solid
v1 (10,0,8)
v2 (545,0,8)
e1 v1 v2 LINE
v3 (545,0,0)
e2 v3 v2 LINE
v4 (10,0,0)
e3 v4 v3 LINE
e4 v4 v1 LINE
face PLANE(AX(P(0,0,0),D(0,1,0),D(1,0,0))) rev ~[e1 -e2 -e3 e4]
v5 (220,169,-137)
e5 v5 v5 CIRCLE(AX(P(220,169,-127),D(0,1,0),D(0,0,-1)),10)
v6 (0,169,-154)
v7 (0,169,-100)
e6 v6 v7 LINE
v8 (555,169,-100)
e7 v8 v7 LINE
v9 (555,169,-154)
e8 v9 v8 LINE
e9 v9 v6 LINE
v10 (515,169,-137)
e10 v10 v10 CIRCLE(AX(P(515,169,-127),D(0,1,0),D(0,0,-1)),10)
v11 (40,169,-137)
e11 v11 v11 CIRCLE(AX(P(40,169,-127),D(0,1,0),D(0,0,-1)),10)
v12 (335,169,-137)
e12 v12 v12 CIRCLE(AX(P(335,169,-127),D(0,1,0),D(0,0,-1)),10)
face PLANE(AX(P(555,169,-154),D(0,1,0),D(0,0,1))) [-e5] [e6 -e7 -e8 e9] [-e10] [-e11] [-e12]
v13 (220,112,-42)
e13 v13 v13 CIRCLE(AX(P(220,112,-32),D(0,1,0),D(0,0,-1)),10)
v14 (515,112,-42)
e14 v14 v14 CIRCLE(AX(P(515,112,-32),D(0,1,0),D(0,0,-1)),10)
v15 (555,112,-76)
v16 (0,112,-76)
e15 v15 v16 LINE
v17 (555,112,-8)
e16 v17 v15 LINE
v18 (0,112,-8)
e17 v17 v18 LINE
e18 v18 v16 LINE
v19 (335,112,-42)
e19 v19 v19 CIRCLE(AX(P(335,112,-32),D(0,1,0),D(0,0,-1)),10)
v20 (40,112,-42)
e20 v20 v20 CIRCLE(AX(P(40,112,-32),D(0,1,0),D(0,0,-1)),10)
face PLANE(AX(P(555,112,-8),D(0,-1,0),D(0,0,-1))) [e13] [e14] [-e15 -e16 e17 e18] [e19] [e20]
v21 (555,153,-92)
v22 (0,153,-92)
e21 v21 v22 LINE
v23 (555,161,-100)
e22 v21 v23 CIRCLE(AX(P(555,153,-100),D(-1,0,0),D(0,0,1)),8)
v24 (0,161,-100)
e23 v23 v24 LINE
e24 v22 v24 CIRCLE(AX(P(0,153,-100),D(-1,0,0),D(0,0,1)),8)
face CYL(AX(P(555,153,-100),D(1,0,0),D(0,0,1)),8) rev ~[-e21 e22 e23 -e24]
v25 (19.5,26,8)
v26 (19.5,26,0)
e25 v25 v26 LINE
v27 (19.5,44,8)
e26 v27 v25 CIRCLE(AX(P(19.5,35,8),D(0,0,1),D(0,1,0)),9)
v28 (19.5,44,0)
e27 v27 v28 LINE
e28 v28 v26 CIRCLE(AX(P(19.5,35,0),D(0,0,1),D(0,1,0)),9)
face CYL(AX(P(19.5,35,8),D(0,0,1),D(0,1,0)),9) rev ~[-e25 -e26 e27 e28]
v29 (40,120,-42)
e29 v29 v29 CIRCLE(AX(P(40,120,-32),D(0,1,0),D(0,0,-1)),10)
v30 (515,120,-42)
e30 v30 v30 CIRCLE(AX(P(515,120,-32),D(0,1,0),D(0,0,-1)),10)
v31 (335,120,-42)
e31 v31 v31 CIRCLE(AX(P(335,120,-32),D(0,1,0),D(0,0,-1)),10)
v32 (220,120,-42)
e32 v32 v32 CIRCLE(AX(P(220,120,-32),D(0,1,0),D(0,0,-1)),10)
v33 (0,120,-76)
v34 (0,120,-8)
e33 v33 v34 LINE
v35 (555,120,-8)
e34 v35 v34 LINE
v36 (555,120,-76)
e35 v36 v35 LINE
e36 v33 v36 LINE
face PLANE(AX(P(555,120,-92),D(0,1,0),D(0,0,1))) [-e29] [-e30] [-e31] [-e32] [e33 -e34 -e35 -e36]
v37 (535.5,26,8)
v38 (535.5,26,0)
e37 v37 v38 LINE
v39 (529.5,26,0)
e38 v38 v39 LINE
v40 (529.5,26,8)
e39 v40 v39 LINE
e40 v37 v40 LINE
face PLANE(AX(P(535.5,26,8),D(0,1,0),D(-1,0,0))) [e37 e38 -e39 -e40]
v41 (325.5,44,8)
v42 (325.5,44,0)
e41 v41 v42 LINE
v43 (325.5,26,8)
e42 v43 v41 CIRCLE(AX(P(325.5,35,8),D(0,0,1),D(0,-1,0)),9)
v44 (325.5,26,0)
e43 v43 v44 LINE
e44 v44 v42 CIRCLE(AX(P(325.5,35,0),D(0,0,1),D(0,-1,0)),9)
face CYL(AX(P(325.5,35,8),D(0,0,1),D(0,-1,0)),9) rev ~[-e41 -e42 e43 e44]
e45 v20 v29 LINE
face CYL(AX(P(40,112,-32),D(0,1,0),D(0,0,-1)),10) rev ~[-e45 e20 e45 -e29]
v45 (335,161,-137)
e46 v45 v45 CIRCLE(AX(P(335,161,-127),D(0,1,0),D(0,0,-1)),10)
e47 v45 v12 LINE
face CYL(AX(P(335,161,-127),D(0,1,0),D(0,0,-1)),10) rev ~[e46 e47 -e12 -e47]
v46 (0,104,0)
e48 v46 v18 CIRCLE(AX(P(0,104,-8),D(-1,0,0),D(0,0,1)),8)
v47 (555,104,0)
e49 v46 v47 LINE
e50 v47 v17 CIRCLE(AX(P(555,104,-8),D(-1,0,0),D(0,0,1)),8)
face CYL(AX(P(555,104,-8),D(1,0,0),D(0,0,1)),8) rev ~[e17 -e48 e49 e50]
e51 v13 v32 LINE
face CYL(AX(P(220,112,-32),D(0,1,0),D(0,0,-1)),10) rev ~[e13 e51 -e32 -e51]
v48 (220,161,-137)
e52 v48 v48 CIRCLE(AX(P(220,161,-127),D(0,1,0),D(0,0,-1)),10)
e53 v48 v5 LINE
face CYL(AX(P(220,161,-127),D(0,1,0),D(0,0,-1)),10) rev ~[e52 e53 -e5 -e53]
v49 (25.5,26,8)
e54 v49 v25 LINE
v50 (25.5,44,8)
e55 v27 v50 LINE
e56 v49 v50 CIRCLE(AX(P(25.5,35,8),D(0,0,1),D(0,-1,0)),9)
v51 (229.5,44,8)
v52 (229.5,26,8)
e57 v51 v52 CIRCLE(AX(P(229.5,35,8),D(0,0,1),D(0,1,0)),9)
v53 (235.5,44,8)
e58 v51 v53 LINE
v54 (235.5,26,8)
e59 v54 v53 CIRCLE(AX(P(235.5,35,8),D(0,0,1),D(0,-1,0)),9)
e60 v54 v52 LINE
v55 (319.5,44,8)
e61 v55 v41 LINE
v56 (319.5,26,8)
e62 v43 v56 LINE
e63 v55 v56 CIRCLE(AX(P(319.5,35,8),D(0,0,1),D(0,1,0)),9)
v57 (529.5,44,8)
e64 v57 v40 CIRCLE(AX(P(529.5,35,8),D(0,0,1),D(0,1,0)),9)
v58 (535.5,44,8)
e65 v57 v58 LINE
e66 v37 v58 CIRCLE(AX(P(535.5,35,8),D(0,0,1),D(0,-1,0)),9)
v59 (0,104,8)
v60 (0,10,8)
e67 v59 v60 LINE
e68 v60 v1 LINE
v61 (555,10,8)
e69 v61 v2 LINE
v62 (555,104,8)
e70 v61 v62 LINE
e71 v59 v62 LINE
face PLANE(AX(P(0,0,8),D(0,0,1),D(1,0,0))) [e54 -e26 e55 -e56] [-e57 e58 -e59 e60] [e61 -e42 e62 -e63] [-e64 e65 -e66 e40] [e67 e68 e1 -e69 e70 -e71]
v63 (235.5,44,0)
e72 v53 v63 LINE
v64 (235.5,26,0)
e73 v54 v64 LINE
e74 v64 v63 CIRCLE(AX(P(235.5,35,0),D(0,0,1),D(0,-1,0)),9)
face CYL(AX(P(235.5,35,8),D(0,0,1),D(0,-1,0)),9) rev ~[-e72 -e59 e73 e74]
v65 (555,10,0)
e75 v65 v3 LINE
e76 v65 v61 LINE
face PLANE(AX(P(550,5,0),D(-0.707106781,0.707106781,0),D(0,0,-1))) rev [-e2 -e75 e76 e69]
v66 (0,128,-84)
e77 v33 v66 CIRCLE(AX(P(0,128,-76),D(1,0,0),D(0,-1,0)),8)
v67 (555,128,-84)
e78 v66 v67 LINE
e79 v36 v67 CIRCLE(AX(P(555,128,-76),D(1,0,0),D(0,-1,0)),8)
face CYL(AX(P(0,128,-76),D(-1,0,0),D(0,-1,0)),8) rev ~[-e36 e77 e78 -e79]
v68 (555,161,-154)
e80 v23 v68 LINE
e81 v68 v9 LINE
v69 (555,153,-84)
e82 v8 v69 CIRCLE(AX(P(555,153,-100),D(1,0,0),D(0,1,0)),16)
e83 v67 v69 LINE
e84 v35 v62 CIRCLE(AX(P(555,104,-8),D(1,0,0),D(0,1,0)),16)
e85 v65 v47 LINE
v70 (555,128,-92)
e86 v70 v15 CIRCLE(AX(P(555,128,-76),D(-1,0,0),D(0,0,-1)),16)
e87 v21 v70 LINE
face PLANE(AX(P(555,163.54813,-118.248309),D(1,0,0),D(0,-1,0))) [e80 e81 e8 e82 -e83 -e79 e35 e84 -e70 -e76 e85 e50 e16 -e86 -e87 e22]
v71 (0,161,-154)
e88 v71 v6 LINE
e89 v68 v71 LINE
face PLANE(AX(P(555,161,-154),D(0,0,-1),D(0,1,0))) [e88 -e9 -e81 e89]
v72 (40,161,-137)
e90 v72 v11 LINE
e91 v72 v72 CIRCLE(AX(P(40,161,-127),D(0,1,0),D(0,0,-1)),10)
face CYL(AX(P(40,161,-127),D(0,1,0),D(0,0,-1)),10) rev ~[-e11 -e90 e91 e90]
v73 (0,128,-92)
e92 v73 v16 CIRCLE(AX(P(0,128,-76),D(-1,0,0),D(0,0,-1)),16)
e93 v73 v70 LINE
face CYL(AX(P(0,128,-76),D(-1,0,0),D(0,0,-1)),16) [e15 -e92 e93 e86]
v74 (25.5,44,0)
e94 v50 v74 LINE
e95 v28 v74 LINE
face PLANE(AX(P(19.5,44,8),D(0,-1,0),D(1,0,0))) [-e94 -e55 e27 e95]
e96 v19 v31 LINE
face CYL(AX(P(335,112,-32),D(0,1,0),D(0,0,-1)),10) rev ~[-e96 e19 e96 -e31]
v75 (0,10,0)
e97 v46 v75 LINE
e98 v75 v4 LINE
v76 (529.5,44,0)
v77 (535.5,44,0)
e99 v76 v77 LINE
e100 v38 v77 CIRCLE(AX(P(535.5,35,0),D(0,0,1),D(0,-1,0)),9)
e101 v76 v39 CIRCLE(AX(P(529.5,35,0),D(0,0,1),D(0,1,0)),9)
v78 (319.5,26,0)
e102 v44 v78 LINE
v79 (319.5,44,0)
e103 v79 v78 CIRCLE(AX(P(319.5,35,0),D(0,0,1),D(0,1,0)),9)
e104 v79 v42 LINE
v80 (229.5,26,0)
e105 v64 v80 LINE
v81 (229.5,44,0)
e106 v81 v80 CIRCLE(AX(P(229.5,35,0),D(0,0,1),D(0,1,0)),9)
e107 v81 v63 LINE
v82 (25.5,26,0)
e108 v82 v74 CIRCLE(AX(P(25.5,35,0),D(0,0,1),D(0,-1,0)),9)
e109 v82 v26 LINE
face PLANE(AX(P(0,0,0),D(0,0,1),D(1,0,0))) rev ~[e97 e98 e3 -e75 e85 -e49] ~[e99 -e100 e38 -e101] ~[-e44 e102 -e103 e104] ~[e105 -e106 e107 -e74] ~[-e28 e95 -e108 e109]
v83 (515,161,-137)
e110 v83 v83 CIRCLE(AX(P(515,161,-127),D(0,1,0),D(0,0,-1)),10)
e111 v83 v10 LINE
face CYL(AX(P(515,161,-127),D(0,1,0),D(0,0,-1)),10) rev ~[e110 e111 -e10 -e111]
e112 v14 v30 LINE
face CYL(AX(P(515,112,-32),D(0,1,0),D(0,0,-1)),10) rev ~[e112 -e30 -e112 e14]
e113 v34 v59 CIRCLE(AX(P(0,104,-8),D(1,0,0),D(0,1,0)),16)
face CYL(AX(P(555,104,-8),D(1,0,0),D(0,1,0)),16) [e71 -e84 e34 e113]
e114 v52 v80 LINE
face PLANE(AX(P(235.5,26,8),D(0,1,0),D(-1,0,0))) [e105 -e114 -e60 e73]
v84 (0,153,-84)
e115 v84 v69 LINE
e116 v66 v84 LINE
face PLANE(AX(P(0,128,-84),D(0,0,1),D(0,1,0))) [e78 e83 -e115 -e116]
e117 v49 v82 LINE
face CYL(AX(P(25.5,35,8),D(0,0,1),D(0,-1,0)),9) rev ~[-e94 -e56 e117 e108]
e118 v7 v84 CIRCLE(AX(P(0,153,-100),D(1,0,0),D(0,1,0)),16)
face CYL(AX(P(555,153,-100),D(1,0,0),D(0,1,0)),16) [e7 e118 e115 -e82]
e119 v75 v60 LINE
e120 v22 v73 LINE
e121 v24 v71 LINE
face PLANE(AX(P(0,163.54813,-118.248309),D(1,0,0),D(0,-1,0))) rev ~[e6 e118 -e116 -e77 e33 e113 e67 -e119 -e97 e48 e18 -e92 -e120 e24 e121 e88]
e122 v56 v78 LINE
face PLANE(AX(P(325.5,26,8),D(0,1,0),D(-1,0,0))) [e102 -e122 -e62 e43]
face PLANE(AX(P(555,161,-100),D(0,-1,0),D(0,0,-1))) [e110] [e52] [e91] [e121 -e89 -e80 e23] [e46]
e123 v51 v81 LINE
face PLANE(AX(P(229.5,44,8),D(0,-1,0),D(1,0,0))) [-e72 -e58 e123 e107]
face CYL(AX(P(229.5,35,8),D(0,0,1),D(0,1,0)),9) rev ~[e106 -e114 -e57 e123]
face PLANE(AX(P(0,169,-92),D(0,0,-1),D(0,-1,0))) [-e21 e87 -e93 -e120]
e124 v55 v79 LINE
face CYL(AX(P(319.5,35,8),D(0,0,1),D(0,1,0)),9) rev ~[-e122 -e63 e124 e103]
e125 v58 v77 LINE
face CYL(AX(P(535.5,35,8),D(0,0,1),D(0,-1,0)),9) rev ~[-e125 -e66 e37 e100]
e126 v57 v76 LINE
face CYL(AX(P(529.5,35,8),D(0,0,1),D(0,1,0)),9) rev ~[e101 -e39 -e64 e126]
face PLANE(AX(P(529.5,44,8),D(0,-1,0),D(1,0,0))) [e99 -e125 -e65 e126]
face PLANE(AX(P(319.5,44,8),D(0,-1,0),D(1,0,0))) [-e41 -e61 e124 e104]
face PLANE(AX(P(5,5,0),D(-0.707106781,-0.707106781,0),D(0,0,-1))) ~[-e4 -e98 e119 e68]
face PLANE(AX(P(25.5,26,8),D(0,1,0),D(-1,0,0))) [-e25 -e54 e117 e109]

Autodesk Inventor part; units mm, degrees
ref_plane "YZ Plane" through (0, 0, 0) normal (1, 0, 0) x (0, 1, 0)
ref_plane "XZ Plane" through (0, 0, 0) normal (0, 1, 0) x (-1, 0, 0)
ref_plane "XY Plane" through (0, 0, 0) normal (0, 0, 1) x (1, 0, 0)
sketch "Sketch1" plane through (0, 0, 0) normal (0, 0, 1) x (1, 0, 0)
  line L0 (0, 0) -> (555, 0)
  line L1 (555, 0) -> (555, 120)
  line L2 (555, 120) -> (0, 120)
  line L3 (0, 120) -> (0, 0)
  dimension "d0" = 120
  dimension "d1" = 555
extrude "Plate1" add sketch "Sketch1" along normal blind 8
sketch "Sketch2" plane through (555, 112, 8) normal (0, 1, 0) x (-1, 0, 0)
  line L0 (555, 0) -> (0, 0)
  line L1 (0, 0) -> (0, -100)
  line L2 (0, -100) -> (555, -100)
  line L3 (555, -100) -> (555, 0)
edge flange "Flange1" height 100 angle 90 thickness 8 bend radius 8 thickness toward (0, 1, 0) relief tear relief width 8 relief depth 4 edges at (277.5, 120, 0) wall of the first edge with corners at (0, 112, 8) (555, 112, 8) (555, 112, -92) (0, 112, -92)
bend "Bend1"
corner "Corner1"
sketch "Sketch3" plane through (0, 112, -92) normal (0, -1, 0) x (1, 0, 0)
  line L0 (0, 0) -> (0, 84) projected
  line L1 (0, 0) -> (555, 0) projected
  line L2 (555, 0) -> (555, 84) projected
  circle A0 centre (40, 60) radius 10
  circle A1 centre (515, 60) radius 10
  circle A2 centre (220, 60) radius 10
  circle A3 centre (335, 60) radius 10
  point P0 (0, 92)
  dimension "d13" = 20
  dimension "d14" = 20
  dimension "d15" = 40
  dimension "d16" = 60
  dimension "d17" = 60
  dimension "d18" = 40
  dimension "d19" = 20
  dimension "d20" = 180
  dimension "d21" = 20
  dimension "d22" = 180
  dimension "d23" = 60
  dimension "d24" = 60
hole "Hole1" at (40, 112, -32) at (220, 112, -32) at (335, 112, -32) at (515, 112, -32) direction (0, 1, 0) diameter 20 depth 8 tip angle 118
sketch "Sketch4" plane through (0, 0, 8) normal (0, 0, 1) x (1, 0, 0)
  circle A0 centre (544.5, 10.5) radius 1.1625 projected
  circle A1 centre (544.5, 59.5) radius 1.1625 projected
  arc A2 (535.5, 26) -> (535.5, 44) centre (535.5, 35) ccw projected
  line L0 (535.5, 26) -> (529.5, 26) projected
  arc A3 (529.5, 44) -> (529.5, 26) centre (529.5, 35) ccw projected
  line L1 (529.5, 44) -> (535.5, 44) projected
  line L2 (507.5, 26.468) -> (507.5, 43.532) projected
  arc A4 (505.7408, 21) -> (507.5, 26.468) centre (471.6029, 35) ccw projected
  line L3 (505.7408, 21) -> (482.22, 0) projected
  line L4 (482.22, 0) -> (545, 0) projected
  line L5 (545, 0) -> (553, 8) projected
  line L6 (553, 8) -> (553, 62) projected
  line L7 (553, 62) -> (545, 70) projected
  line L8 (482.22, 70) -> (545, 70) projected
  line L9 (482.22, 70) -> (505.7408, 49) projected
  arc A5 (507.5, 43.532) -> (505.7408, 49) centre (471.6029, 35) ccw projected
  circle A6 centre (310.5, 10.5) radius 1.1625 projected
  circle A7 centre (310.5, 59.5) radius 1.1625 projected
  arc A8 (325.5, 26) -> (325.5, 44) centre (325.5, 35) ccw projected
  line L10 (325.5, 26) -> (319.5, 26) projected
  arc A9 (319.5, 44) -> (319.5, 26) centre (319.5, 35) ccw projected
  line L11 (319.5, 44) -> (325.5, 44) projected
  line L12 (347.5, 26.468) -> (347.5, 43.532) projected
  arc A10 (349.2592, 49) -> (347.5, 43.532) centre (383.3971, 35) ccw projected
  line L13 (349.2592, 49) -> (372.78, 70) projected
  line L14 (372.78, 70) -> (310, 70) projected
  line L15 (310, 70) -> (302, 62) projected
  line L16 (302, 8) -> (302, 62) projected
  line L17 (302, 8) -> (310, 0) projected
  line L18 (372.78, 0) -> (310, 0) projected
  line L19 (372.78, 0) -> (349.2592, 21) projected
  arc A11 (347.5, 26.468) -> (349.2592, 21) centre (383.3971, 35) ccw projected
  circle A12 centre (244.5, 10.5) radius 1.1625 projected
  circle A13 centre (244.5, 59.5) radius 1.1625 projected
  arc A14 (235.5, 26) -> (235.5, 44) centre (235.5, 35) ccw projected
  line L20 (235.5, 26) -> (229.5, 26) projected
  arc A15 (229.5, 44) -> (229.5, 26) centre (229.5, 35) ccw projected
  line L21 (229.5, 44) -> (235.5, 44) projected
  line L22 (207.5, 26.468) -> (207.5, 43.532) projected
  arc A16 (205.7408, 21) -> (207.5, 26.468) centre (171.6029, 35) ccw projected
  line L23 (205.7408, 21) -> (182.22, 0) projected
  line L24 (182.22, 0) -> (245, 0) projected
  line L25 (245, 0) -> (253, 8) projected
  line L26 (253, 8) -> (253, 62) projected
  line L27 (253, 62) -> (245, 70) projected
  line L28 (182.22, 70) -> (245, 70) projected
  line L29 (182.22, 70) -> (205.7408, 49) projected
  arc A17 (207.5, 43.532) -> (205.7408, 49) centre (171.6029, 35) ccw projected
  circle A18 centre (10.5, 10.5) radius 1.1625 projected
  circle A19 centre (10.5, 59.5) radius 1.1625 projected
  arc A20 (25.5, 26) -> (25.5, 44) centre (25.5, 35) ccw projected
  line L30 (25.5, 26) -> (19.5, 26) projected
  arc A21 (19.5, 44) -> (19.5, 26) centre (19.5, 35) ccw projected
  line L31 (19.5, 44) -> (25.5, 44) projected
  line L32 (47.5, 26.468) -> (47.5, 43.532) projected
  arc A22 (49.2592, 49) -> (47.5, 43.532) centre (83.3971, 35) ccw projected
  line L33 (49.2592, 49) -> (72.78, 70) projected
  line L34 (72.78, 70) -> (10, 70) projected
  line L35 (10, 70) -> (2, 62) projected
  line L36 (2, 8) -> (2, 62) projected
  line L37 (2, 8) -> (10, 0) projected
  line L38 (72.78, 0) -> (10, 0) projected
  line L39 (72.78, 0) -> (49.2592, 21) projected
  arc A23 (47.5, 26.468) -> (49.2592, 21) centre (83.3971, 35) ccw projected
extrude "Extrusion1" cut sketch "Sketch4" against normal blind 10 contours L0 A3 L1 A2 | L10 A9 L11 A8 | L20 A15 L21 A14 | L30 A21 L31 A20
chamfer "Corner Chamfer1" distance 10 angle 45 2 edges at (555, 0, 4) (0, 0, 4)
sketch "Sketch5" plane through (0, 112, -84) normal (0, 0, -1) x (-1, 0, 0)
  line L0 (-555, 0) -> (0, 0)
  line L1 (0, 0) -> (0, 57)
  line L2 (0, 57) -> (-555, 57)
  line L3 (-555, 57) -> (-555, 0)
edge flange "Flange2" height 57 angle 90 thickness 8 bend radius 8 thickness toward (0, 0, -1) relief tear relief width 8 relief depth 4 edges at (277.5, 120, -92) wall of the first edge with corners at (555, 112, -84) (0, 112, -84) (0, 169, -84) (555, 169, -84)
bend "Bend2"
corner "Corner2"
sketch "Sketch6" plane through (555, 161, -84) normal (0, 1, 0) x (-1, 0, 0)
  line L0 (555, 0) -> (0, 0)
  line L1 (0, 0) -> (0, -70)
  line L2 (0, -70) -> (555, -70)
  line L3 (555, -70) -> (555, 0)
edge flange "Flange3" height 70 angle 90 thickness 8 bend radius 8 thickness toward (0, 1, 0) relief tear relief width 8 relief depth 4 edges at (277.5, 169, -92) wall of the first edge with corners at (0, 161, -84) (555, 161, -84) (555, 161, -154) (0, 161, -154)
bend "Bend3"
corner "Corner3"
sketch "Sketch7" plane through (0, 161, -154) normal (0, -1, 0) x (1, 0, 0)
  line L0 (0, 0) -> (0, 54) projected
  line L1 (0, 0) -> (555, 0) projected
  line L2 (555, 0) -> (555, 54) projected
  circle A0 centre (40, 27) radius 10
  circle A1 centre (515, 27) radius 10
  circle A2 centre (220, 27) radius 10
  circle A3 centre (335, 27) radius 10
  point P0 (0, 154)
  dimension "d57" = 20
  dimension "d58" = 40
  dimension "d59" = 27
  dimension "d60" = 20
  dimension "d61" = 40
  dimension "d62" = 27
  dimension "d63" = 20
  dimension "d64" = 20
  dimension "d65" = 180
  dimension "d66" = 27
  dimension "d67" = 180
  dimension "d68" = 27
hole "Hole2" at (40, 161, -127) at (220, 161, -127) at (335, 161, -127) at (515, 161, -127) direction (0, 1, 0) diameter 20 depth 8 tip angle 118
equation "\"d30\" = Thickness"
equation "\"d74\" = Thickness"
equation "\"d3\" = BendReliefWidth"
equation "\"d4\" = BendReliefDepth"
equation "\"d5\" = MinimumRemnant"
equation "\"d6\" = BendRadius"
equation "\"d9\" = BendRadius"
equation "\"d10\" = CornerReliefSize"
equation "\"d11\" = GapSize"
equation "\"d12\" = JacobiRadiusSize"
equation "\"d37\" = BendReliefWidth"
equation "\"d38\" = BendReliefDepth"
equation "\"d39\" = MinimumRemnant"
equation "\"d40\" = BendRadius"
equation "\"d43\" = BendRadius"
equation "\"d44\" = CornerReliefSize"
equation "\"d45\" = GapSize"
equation "\"d46\" = JacobiRadiusSize"
equation "\"d47\" = BendReliefWidth"
equation "\"d48\" = BendReliefDepth"
equation "\"d49\" = MinimumRemnant"
equation "\"d50\" = BendRadius"
equation "\"d53\" = BendRadius"
equation "\"d54\" = CornerReliefSize"
equation "\"d55\" = GapSize"
equation "\"d56\" = JacobiRadiusSize"
equation "\"BendRadius\" = Thickness"
equation "\"BendReliefWidth\" = Thickness"
equation "\"BendReliefDepth\" = 0.5 * Thickness"
equation "\"CornerReliefSize\" = 4 * Thickness"
equation "\"MinimumRemnant\" = 2 * Thickness"
equation "\"TransitionRadius\" = BendRadius"
equation "\"JacobiRadiusSize\" = BendRadius"
equation "\"GapSize\" = Thickness"
equation "\"d2\" = BendRadius"
equation "\"Thickness\" = 8"
properties part number "Bearing Base"
